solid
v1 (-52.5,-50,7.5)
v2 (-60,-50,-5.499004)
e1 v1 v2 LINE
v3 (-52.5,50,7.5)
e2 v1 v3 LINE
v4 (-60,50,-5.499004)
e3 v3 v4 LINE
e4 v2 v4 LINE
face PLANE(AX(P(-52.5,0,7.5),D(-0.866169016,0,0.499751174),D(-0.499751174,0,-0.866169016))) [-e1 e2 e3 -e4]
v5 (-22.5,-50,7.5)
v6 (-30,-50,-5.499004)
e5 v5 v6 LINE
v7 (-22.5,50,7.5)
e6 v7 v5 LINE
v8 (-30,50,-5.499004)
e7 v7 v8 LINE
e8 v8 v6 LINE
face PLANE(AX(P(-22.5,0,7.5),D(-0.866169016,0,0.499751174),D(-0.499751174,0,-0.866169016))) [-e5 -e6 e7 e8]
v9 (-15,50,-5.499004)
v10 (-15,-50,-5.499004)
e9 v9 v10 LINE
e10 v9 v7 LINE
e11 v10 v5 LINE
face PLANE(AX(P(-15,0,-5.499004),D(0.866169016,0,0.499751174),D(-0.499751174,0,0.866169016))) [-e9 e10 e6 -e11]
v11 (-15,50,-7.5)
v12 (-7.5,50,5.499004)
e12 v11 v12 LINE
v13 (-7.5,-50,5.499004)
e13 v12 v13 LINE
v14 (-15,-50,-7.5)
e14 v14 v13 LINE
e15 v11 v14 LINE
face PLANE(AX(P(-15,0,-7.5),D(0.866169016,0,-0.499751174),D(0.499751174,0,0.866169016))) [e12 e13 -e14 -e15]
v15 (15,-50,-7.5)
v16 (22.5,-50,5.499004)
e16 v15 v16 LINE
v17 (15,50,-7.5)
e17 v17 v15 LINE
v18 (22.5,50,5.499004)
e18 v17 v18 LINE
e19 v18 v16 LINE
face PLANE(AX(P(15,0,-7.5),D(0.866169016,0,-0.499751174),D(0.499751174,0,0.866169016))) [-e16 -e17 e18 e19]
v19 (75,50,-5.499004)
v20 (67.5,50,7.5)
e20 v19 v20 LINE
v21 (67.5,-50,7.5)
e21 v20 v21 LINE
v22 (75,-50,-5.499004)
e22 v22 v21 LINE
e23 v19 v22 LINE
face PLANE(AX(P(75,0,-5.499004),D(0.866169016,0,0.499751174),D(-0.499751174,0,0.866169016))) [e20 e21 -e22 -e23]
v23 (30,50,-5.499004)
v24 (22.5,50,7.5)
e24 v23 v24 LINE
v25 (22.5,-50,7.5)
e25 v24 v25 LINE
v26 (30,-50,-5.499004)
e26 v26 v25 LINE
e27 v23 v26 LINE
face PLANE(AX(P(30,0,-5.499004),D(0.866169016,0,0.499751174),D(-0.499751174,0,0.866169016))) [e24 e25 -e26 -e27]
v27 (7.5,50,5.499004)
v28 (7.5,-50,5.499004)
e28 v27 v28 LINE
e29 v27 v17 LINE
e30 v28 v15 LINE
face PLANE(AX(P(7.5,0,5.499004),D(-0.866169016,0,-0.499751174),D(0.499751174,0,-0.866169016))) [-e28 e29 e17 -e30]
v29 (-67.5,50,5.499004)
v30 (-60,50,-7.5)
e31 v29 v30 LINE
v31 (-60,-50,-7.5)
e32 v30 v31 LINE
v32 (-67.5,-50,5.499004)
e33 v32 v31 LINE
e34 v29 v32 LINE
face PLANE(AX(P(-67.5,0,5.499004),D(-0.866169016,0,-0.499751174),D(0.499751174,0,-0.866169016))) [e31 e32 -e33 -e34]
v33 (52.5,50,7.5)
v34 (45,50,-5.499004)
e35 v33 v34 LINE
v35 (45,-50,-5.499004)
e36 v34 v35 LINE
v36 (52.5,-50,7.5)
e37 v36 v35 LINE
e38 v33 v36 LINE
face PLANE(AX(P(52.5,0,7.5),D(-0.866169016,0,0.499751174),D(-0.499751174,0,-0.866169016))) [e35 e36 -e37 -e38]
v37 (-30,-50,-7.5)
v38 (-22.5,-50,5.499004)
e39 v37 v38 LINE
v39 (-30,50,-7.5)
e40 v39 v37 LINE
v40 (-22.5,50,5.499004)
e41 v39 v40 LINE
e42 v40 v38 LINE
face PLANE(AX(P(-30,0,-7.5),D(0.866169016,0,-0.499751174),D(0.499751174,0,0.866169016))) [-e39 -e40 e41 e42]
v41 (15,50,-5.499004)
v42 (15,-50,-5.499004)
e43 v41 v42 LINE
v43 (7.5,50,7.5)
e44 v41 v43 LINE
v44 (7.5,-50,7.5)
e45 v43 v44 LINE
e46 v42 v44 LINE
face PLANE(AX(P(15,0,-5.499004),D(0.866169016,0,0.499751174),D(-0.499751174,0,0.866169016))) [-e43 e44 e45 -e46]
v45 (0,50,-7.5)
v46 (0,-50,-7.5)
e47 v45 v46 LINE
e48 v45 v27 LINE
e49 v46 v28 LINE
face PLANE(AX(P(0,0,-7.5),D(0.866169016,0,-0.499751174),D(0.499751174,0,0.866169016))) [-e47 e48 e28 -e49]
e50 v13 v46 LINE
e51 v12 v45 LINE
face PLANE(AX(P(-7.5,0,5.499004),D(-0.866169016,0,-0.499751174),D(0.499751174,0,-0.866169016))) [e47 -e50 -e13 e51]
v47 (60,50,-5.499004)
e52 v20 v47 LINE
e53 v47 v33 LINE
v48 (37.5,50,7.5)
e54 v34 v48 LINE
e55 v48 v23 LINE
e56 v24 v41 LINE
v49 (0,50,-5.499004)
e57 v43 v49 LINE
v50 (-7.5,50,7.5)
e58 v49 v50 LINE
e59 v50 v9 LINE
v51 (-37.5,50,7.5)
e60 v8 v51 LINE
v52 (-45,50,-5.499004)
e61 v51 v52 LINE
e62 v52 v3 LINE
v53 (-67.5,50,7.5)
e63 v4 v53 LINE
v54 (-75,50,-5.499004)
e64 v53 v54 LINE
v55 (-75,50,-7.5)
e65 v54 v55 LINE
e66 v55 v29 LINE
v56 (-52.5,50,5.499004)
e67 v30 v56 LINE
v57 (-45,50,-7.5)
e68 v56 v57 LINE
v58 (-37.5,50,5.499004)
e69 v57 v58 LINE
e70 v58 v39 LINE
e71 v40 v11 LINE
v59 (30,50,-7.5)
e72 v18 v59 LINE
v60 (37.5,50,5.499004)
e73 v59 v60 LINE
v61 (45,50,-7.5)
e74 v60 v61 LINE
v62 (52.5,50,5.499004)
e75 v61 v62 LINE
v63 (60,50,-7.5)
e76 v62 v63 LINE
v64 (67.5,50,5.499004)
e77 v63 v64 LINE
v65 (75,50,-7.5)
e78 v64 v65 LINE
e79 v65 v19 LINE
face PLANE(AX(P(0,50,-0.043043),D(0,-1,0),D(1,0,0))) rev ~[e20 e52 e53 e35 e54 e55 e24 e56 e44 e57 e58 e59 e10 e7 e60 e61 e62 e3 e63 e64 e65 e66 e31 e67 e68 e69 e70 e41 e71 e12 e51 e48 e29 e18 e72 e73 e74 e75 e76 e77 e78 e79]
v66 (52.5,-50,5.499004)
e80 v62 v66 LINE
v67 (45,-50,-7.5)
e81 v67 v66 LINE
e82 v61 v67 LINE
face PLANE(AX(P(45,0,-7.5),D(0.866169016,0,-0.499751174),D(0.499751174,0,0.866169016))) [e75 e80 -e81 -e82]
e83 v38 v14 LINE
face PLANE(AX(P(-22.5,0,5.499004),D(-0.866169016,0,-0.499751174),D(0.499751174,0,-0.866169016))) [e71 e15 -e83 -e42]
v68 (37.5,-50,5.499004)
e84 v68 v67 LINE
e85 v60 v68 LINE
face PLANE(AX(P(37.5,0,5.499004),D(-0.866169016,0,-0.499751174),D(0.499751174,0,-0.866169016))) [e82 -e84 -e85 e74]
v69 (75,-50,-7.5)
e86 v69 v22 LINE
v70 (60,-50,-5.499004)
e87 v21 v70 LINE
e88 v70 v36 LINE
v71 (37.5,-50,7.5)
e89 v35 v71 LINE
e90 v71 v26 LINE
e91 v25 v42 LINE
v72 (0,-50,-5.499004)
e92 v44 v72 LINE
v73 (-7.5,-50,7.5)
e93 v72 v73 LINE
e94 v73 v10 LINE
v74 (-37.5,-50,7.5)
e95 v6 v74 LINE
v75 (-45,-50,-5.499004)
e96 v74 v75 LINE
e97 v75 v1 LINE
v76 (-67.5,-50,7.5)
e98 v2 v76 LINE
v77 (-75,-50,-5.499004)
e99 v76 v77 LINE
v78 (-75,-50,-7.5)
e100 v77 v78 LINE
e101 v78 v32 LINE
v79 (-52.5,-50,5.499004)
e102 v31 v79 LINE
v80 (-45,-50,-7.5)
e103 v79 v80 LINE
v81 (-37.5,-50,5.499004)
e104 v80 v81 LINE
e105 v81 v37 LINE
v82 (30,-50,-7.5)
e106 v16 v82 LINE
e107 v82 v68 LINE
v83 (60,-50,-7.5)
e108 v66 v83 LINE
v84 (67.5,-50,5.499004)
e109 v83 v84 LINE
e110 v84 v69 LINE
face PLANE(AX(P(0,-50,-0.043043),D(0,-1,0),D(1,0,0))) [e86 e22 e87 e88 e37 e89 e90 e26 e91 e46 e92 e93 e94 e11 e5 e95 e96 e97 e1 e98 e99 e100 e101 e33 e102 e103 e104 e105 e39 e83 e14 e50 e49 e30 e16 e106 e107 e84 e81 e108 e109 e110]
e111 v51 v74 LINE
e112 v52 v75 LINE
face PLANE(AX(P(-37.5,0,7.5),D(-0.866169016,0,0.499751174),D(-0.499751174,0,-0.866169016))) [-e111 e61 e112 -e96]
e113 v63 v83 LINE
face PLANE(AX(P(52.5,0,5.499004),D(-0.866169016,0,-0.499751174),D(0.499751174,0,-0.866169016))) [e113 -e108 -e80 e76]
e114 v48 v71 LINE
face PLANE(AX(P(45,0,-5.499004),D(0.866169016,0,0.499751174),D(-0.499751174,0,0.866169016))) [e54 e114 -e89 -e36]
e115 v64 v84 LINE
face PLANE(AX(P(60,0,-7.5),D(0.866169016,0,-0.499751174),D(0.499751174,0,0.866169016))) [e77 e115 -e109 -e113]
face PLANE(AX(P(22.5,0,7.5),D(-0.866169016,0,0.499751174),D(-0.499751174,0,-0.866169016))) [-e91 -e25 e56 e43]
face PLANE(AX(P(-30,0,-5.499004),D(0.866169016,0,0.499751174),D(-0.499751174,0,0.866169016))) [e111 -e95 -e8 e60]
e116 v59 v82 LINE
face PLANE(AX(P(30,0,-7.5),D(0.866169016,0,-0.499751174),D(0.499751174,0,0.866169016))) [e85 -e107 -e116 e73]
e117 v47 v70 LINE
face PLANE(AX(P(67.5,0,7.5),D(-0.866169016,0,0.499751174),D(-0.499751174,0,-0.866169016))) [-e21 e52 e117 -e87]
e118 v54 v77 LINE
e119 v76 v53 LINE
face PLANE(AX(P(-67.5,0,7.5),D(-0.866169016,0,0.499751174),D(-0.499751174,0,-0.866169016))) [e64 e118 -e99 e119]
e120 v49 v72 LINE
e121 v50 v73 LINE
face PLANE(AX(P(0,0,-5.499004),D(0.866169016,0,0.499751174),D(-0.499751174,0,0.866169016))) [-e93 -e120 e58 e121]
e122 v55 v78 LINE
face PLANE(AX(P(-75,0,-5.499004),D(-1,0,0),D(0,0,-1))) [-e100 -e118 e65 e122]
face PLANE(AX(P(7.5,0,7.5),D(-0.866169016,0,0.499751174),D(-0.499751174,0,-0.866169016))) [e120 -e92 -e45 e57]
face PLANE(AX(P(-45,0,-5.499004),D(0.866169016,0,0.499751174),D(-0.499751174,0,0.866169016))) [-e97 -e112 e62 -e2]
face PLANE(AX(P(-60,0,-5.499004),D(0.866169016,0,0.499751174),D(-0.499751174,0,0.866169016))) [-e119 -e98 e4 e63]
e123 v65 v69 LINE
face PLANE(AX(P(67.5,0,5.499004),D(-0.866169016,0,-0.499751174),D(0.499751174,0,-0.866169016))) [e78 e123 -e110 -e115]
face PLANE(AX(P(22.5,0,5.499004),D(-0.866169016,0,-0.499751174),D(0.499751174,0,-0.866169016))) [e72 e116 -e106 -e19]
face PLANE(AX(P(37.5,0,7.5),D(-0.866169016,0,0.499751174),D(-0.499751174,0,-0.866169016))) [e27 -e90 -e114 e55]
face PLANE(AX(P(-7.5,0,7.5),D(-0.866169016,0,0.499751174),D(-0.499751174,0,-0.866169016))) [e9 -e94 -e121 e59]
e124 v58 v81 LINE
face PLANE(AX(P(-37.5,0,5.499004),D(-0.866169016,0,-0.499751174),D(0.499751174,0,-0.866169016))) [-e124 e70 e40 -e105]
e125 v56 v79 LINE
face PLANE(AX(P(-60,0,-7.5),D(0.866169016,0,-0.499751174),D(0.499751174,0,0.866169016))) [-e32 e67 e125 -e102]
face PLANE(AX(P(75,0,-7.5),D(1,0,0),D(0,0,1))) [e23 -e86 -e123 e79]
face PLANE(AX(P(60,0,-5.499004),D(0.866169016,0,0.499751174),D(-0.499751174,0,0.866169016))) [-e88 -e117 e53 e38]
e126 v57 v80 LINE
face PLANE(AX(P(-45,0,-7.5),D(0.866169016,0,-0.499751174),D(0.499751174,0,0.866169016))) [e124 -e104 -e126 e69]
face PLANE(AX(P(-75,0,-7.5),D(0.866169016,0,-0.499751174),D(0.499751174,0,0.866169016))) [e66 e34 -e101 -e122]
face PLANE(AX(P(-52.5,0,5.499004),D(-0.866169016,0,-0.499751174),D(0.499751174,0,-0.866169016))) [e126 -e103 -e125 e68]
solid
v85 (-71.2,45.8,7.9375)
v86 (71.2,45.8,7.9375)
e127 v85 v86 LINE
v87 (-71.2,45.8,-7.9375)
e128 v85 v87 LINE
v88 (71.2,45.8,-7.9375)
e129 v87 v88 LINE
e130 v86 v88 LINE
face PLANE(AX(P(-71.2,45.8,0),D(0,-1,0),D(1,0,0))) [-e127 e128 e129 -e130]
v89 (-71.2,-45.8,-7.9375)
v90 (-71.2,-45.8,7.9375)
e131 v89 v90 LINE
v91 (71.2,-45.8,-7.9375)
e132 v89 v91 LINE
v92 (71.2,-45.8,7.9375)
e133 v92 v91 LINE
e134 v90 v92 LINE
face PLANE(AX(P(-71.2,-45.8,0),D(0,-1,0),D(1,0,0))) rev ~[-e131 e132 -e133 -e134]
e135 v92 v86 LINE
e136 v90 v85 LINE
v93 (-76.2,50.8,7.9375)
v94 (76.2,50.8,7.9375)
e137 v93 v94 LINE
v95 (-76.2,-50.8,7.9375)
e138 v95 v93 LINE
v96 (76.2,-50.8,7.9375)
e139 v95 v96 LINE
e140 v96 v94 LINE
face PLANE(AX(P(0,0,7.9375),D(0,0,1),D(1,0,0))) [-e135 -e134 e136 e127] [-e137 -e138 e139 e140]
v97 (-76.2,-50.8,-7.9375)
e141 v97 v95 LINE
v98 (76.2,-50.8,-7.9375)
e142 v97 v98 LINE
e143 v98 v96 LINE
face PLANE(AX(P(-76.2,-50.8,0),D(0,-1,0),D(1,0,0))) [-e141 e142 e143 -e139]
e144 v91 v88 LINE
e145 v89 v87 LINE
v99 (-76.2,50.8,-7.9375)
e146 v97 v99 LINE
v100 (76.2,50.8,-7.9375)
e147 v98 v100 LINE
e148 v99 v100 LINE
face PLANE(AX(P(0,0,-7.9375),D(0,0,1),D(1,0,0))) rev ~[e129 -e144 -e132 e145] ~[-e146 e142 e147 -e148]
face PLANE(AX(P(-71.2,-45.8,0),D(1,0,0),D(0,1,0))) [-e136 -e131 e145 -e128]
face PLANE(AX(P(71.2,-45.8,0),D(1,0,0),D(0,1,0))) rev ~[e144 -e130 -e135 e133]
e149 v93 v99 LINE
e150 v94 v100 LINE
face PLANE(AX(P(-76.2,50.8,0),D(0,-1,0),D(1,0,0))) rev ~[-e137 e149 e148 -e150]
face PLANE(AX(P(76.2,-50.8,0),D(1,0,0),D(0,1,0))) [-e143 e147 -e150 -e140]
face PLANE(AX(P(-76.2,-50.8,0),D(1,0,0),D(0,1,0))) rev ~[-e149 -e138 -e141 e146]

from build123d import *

# Parameters (mm, degrees)
F1_DEPTH = 50
F2_W     = 152.4
F2_H     = 101.6
F2_W_2   = 142.4
F2_H_2   = 91.6
F3_DEPTH = 7.9375


# Not quite as in the source:
# - a length typed as a fraction of an inch, garbled in the dataset ("3 / 203.2 mm" for 3/8 in), is restored
# - a feature names something its author has since deleted; it is built from what else it names


with BuildPart() as f1:
    # F0 (on Front) → F1 (new body, symmetric)
    with BuildSketch(Plane.XZ):
        Polygon((-67.5, 7.5), (-75, -5.4990042023), (-75, -7.5), (-67.5, 5.4990042023), (-60, -7.5), (-52.5, 5.4990042023), (-45, -7.5), (-37.5, 5.4990042023), (-30, -7.5), (-22.5, 5.4990042023), (-15, -7.5), (-7.5, 5.4990042023), (0, -7.5), (7.5, 5.4990042023), (15, -7.5), (22.5, 5.4990042023), (30, -7.5), (37.5, 5.4990042023), (45, -7.5), (52.5, 5.4990042023), (60, -7.5), (67.5, 5.4990042023), (75, -7.5), (75, -5.4990042023), (67.5, 7.5), (60, -5.4990042023), (52.5, 7.5), (45, -5.4990042023), (37.5, 7.5), (30, -5.4990042023), (22.5, 7.5), (15, -5.4990042023), (7.5, 7.5), (0, -5.4990042023), (-7.5, 7.5), (-15, -5.4990042023), (-22.5, 7.5), (-30, -5.4990042023), (-37.5, 7.5), (-45, -5.4990042023), (-52.5, 7.5), (-60, -5.4990042023), align=None)
    extrude(amount=F1_DEPTH, both=True)


with BuildPart() as f3:
    # F2 (on Top) → F3 (new body, symmetric)
    with BuildSketch(Plane.XY):
        Rectangle(F2_W, F2_H)
        Rectangle(F2_W_2, F2_H_2, mode=Mode.SUBTRACT)
    extrude(amount=F3_DEPTH, both=True)


solid = Compound([f1.part, f3.part])
